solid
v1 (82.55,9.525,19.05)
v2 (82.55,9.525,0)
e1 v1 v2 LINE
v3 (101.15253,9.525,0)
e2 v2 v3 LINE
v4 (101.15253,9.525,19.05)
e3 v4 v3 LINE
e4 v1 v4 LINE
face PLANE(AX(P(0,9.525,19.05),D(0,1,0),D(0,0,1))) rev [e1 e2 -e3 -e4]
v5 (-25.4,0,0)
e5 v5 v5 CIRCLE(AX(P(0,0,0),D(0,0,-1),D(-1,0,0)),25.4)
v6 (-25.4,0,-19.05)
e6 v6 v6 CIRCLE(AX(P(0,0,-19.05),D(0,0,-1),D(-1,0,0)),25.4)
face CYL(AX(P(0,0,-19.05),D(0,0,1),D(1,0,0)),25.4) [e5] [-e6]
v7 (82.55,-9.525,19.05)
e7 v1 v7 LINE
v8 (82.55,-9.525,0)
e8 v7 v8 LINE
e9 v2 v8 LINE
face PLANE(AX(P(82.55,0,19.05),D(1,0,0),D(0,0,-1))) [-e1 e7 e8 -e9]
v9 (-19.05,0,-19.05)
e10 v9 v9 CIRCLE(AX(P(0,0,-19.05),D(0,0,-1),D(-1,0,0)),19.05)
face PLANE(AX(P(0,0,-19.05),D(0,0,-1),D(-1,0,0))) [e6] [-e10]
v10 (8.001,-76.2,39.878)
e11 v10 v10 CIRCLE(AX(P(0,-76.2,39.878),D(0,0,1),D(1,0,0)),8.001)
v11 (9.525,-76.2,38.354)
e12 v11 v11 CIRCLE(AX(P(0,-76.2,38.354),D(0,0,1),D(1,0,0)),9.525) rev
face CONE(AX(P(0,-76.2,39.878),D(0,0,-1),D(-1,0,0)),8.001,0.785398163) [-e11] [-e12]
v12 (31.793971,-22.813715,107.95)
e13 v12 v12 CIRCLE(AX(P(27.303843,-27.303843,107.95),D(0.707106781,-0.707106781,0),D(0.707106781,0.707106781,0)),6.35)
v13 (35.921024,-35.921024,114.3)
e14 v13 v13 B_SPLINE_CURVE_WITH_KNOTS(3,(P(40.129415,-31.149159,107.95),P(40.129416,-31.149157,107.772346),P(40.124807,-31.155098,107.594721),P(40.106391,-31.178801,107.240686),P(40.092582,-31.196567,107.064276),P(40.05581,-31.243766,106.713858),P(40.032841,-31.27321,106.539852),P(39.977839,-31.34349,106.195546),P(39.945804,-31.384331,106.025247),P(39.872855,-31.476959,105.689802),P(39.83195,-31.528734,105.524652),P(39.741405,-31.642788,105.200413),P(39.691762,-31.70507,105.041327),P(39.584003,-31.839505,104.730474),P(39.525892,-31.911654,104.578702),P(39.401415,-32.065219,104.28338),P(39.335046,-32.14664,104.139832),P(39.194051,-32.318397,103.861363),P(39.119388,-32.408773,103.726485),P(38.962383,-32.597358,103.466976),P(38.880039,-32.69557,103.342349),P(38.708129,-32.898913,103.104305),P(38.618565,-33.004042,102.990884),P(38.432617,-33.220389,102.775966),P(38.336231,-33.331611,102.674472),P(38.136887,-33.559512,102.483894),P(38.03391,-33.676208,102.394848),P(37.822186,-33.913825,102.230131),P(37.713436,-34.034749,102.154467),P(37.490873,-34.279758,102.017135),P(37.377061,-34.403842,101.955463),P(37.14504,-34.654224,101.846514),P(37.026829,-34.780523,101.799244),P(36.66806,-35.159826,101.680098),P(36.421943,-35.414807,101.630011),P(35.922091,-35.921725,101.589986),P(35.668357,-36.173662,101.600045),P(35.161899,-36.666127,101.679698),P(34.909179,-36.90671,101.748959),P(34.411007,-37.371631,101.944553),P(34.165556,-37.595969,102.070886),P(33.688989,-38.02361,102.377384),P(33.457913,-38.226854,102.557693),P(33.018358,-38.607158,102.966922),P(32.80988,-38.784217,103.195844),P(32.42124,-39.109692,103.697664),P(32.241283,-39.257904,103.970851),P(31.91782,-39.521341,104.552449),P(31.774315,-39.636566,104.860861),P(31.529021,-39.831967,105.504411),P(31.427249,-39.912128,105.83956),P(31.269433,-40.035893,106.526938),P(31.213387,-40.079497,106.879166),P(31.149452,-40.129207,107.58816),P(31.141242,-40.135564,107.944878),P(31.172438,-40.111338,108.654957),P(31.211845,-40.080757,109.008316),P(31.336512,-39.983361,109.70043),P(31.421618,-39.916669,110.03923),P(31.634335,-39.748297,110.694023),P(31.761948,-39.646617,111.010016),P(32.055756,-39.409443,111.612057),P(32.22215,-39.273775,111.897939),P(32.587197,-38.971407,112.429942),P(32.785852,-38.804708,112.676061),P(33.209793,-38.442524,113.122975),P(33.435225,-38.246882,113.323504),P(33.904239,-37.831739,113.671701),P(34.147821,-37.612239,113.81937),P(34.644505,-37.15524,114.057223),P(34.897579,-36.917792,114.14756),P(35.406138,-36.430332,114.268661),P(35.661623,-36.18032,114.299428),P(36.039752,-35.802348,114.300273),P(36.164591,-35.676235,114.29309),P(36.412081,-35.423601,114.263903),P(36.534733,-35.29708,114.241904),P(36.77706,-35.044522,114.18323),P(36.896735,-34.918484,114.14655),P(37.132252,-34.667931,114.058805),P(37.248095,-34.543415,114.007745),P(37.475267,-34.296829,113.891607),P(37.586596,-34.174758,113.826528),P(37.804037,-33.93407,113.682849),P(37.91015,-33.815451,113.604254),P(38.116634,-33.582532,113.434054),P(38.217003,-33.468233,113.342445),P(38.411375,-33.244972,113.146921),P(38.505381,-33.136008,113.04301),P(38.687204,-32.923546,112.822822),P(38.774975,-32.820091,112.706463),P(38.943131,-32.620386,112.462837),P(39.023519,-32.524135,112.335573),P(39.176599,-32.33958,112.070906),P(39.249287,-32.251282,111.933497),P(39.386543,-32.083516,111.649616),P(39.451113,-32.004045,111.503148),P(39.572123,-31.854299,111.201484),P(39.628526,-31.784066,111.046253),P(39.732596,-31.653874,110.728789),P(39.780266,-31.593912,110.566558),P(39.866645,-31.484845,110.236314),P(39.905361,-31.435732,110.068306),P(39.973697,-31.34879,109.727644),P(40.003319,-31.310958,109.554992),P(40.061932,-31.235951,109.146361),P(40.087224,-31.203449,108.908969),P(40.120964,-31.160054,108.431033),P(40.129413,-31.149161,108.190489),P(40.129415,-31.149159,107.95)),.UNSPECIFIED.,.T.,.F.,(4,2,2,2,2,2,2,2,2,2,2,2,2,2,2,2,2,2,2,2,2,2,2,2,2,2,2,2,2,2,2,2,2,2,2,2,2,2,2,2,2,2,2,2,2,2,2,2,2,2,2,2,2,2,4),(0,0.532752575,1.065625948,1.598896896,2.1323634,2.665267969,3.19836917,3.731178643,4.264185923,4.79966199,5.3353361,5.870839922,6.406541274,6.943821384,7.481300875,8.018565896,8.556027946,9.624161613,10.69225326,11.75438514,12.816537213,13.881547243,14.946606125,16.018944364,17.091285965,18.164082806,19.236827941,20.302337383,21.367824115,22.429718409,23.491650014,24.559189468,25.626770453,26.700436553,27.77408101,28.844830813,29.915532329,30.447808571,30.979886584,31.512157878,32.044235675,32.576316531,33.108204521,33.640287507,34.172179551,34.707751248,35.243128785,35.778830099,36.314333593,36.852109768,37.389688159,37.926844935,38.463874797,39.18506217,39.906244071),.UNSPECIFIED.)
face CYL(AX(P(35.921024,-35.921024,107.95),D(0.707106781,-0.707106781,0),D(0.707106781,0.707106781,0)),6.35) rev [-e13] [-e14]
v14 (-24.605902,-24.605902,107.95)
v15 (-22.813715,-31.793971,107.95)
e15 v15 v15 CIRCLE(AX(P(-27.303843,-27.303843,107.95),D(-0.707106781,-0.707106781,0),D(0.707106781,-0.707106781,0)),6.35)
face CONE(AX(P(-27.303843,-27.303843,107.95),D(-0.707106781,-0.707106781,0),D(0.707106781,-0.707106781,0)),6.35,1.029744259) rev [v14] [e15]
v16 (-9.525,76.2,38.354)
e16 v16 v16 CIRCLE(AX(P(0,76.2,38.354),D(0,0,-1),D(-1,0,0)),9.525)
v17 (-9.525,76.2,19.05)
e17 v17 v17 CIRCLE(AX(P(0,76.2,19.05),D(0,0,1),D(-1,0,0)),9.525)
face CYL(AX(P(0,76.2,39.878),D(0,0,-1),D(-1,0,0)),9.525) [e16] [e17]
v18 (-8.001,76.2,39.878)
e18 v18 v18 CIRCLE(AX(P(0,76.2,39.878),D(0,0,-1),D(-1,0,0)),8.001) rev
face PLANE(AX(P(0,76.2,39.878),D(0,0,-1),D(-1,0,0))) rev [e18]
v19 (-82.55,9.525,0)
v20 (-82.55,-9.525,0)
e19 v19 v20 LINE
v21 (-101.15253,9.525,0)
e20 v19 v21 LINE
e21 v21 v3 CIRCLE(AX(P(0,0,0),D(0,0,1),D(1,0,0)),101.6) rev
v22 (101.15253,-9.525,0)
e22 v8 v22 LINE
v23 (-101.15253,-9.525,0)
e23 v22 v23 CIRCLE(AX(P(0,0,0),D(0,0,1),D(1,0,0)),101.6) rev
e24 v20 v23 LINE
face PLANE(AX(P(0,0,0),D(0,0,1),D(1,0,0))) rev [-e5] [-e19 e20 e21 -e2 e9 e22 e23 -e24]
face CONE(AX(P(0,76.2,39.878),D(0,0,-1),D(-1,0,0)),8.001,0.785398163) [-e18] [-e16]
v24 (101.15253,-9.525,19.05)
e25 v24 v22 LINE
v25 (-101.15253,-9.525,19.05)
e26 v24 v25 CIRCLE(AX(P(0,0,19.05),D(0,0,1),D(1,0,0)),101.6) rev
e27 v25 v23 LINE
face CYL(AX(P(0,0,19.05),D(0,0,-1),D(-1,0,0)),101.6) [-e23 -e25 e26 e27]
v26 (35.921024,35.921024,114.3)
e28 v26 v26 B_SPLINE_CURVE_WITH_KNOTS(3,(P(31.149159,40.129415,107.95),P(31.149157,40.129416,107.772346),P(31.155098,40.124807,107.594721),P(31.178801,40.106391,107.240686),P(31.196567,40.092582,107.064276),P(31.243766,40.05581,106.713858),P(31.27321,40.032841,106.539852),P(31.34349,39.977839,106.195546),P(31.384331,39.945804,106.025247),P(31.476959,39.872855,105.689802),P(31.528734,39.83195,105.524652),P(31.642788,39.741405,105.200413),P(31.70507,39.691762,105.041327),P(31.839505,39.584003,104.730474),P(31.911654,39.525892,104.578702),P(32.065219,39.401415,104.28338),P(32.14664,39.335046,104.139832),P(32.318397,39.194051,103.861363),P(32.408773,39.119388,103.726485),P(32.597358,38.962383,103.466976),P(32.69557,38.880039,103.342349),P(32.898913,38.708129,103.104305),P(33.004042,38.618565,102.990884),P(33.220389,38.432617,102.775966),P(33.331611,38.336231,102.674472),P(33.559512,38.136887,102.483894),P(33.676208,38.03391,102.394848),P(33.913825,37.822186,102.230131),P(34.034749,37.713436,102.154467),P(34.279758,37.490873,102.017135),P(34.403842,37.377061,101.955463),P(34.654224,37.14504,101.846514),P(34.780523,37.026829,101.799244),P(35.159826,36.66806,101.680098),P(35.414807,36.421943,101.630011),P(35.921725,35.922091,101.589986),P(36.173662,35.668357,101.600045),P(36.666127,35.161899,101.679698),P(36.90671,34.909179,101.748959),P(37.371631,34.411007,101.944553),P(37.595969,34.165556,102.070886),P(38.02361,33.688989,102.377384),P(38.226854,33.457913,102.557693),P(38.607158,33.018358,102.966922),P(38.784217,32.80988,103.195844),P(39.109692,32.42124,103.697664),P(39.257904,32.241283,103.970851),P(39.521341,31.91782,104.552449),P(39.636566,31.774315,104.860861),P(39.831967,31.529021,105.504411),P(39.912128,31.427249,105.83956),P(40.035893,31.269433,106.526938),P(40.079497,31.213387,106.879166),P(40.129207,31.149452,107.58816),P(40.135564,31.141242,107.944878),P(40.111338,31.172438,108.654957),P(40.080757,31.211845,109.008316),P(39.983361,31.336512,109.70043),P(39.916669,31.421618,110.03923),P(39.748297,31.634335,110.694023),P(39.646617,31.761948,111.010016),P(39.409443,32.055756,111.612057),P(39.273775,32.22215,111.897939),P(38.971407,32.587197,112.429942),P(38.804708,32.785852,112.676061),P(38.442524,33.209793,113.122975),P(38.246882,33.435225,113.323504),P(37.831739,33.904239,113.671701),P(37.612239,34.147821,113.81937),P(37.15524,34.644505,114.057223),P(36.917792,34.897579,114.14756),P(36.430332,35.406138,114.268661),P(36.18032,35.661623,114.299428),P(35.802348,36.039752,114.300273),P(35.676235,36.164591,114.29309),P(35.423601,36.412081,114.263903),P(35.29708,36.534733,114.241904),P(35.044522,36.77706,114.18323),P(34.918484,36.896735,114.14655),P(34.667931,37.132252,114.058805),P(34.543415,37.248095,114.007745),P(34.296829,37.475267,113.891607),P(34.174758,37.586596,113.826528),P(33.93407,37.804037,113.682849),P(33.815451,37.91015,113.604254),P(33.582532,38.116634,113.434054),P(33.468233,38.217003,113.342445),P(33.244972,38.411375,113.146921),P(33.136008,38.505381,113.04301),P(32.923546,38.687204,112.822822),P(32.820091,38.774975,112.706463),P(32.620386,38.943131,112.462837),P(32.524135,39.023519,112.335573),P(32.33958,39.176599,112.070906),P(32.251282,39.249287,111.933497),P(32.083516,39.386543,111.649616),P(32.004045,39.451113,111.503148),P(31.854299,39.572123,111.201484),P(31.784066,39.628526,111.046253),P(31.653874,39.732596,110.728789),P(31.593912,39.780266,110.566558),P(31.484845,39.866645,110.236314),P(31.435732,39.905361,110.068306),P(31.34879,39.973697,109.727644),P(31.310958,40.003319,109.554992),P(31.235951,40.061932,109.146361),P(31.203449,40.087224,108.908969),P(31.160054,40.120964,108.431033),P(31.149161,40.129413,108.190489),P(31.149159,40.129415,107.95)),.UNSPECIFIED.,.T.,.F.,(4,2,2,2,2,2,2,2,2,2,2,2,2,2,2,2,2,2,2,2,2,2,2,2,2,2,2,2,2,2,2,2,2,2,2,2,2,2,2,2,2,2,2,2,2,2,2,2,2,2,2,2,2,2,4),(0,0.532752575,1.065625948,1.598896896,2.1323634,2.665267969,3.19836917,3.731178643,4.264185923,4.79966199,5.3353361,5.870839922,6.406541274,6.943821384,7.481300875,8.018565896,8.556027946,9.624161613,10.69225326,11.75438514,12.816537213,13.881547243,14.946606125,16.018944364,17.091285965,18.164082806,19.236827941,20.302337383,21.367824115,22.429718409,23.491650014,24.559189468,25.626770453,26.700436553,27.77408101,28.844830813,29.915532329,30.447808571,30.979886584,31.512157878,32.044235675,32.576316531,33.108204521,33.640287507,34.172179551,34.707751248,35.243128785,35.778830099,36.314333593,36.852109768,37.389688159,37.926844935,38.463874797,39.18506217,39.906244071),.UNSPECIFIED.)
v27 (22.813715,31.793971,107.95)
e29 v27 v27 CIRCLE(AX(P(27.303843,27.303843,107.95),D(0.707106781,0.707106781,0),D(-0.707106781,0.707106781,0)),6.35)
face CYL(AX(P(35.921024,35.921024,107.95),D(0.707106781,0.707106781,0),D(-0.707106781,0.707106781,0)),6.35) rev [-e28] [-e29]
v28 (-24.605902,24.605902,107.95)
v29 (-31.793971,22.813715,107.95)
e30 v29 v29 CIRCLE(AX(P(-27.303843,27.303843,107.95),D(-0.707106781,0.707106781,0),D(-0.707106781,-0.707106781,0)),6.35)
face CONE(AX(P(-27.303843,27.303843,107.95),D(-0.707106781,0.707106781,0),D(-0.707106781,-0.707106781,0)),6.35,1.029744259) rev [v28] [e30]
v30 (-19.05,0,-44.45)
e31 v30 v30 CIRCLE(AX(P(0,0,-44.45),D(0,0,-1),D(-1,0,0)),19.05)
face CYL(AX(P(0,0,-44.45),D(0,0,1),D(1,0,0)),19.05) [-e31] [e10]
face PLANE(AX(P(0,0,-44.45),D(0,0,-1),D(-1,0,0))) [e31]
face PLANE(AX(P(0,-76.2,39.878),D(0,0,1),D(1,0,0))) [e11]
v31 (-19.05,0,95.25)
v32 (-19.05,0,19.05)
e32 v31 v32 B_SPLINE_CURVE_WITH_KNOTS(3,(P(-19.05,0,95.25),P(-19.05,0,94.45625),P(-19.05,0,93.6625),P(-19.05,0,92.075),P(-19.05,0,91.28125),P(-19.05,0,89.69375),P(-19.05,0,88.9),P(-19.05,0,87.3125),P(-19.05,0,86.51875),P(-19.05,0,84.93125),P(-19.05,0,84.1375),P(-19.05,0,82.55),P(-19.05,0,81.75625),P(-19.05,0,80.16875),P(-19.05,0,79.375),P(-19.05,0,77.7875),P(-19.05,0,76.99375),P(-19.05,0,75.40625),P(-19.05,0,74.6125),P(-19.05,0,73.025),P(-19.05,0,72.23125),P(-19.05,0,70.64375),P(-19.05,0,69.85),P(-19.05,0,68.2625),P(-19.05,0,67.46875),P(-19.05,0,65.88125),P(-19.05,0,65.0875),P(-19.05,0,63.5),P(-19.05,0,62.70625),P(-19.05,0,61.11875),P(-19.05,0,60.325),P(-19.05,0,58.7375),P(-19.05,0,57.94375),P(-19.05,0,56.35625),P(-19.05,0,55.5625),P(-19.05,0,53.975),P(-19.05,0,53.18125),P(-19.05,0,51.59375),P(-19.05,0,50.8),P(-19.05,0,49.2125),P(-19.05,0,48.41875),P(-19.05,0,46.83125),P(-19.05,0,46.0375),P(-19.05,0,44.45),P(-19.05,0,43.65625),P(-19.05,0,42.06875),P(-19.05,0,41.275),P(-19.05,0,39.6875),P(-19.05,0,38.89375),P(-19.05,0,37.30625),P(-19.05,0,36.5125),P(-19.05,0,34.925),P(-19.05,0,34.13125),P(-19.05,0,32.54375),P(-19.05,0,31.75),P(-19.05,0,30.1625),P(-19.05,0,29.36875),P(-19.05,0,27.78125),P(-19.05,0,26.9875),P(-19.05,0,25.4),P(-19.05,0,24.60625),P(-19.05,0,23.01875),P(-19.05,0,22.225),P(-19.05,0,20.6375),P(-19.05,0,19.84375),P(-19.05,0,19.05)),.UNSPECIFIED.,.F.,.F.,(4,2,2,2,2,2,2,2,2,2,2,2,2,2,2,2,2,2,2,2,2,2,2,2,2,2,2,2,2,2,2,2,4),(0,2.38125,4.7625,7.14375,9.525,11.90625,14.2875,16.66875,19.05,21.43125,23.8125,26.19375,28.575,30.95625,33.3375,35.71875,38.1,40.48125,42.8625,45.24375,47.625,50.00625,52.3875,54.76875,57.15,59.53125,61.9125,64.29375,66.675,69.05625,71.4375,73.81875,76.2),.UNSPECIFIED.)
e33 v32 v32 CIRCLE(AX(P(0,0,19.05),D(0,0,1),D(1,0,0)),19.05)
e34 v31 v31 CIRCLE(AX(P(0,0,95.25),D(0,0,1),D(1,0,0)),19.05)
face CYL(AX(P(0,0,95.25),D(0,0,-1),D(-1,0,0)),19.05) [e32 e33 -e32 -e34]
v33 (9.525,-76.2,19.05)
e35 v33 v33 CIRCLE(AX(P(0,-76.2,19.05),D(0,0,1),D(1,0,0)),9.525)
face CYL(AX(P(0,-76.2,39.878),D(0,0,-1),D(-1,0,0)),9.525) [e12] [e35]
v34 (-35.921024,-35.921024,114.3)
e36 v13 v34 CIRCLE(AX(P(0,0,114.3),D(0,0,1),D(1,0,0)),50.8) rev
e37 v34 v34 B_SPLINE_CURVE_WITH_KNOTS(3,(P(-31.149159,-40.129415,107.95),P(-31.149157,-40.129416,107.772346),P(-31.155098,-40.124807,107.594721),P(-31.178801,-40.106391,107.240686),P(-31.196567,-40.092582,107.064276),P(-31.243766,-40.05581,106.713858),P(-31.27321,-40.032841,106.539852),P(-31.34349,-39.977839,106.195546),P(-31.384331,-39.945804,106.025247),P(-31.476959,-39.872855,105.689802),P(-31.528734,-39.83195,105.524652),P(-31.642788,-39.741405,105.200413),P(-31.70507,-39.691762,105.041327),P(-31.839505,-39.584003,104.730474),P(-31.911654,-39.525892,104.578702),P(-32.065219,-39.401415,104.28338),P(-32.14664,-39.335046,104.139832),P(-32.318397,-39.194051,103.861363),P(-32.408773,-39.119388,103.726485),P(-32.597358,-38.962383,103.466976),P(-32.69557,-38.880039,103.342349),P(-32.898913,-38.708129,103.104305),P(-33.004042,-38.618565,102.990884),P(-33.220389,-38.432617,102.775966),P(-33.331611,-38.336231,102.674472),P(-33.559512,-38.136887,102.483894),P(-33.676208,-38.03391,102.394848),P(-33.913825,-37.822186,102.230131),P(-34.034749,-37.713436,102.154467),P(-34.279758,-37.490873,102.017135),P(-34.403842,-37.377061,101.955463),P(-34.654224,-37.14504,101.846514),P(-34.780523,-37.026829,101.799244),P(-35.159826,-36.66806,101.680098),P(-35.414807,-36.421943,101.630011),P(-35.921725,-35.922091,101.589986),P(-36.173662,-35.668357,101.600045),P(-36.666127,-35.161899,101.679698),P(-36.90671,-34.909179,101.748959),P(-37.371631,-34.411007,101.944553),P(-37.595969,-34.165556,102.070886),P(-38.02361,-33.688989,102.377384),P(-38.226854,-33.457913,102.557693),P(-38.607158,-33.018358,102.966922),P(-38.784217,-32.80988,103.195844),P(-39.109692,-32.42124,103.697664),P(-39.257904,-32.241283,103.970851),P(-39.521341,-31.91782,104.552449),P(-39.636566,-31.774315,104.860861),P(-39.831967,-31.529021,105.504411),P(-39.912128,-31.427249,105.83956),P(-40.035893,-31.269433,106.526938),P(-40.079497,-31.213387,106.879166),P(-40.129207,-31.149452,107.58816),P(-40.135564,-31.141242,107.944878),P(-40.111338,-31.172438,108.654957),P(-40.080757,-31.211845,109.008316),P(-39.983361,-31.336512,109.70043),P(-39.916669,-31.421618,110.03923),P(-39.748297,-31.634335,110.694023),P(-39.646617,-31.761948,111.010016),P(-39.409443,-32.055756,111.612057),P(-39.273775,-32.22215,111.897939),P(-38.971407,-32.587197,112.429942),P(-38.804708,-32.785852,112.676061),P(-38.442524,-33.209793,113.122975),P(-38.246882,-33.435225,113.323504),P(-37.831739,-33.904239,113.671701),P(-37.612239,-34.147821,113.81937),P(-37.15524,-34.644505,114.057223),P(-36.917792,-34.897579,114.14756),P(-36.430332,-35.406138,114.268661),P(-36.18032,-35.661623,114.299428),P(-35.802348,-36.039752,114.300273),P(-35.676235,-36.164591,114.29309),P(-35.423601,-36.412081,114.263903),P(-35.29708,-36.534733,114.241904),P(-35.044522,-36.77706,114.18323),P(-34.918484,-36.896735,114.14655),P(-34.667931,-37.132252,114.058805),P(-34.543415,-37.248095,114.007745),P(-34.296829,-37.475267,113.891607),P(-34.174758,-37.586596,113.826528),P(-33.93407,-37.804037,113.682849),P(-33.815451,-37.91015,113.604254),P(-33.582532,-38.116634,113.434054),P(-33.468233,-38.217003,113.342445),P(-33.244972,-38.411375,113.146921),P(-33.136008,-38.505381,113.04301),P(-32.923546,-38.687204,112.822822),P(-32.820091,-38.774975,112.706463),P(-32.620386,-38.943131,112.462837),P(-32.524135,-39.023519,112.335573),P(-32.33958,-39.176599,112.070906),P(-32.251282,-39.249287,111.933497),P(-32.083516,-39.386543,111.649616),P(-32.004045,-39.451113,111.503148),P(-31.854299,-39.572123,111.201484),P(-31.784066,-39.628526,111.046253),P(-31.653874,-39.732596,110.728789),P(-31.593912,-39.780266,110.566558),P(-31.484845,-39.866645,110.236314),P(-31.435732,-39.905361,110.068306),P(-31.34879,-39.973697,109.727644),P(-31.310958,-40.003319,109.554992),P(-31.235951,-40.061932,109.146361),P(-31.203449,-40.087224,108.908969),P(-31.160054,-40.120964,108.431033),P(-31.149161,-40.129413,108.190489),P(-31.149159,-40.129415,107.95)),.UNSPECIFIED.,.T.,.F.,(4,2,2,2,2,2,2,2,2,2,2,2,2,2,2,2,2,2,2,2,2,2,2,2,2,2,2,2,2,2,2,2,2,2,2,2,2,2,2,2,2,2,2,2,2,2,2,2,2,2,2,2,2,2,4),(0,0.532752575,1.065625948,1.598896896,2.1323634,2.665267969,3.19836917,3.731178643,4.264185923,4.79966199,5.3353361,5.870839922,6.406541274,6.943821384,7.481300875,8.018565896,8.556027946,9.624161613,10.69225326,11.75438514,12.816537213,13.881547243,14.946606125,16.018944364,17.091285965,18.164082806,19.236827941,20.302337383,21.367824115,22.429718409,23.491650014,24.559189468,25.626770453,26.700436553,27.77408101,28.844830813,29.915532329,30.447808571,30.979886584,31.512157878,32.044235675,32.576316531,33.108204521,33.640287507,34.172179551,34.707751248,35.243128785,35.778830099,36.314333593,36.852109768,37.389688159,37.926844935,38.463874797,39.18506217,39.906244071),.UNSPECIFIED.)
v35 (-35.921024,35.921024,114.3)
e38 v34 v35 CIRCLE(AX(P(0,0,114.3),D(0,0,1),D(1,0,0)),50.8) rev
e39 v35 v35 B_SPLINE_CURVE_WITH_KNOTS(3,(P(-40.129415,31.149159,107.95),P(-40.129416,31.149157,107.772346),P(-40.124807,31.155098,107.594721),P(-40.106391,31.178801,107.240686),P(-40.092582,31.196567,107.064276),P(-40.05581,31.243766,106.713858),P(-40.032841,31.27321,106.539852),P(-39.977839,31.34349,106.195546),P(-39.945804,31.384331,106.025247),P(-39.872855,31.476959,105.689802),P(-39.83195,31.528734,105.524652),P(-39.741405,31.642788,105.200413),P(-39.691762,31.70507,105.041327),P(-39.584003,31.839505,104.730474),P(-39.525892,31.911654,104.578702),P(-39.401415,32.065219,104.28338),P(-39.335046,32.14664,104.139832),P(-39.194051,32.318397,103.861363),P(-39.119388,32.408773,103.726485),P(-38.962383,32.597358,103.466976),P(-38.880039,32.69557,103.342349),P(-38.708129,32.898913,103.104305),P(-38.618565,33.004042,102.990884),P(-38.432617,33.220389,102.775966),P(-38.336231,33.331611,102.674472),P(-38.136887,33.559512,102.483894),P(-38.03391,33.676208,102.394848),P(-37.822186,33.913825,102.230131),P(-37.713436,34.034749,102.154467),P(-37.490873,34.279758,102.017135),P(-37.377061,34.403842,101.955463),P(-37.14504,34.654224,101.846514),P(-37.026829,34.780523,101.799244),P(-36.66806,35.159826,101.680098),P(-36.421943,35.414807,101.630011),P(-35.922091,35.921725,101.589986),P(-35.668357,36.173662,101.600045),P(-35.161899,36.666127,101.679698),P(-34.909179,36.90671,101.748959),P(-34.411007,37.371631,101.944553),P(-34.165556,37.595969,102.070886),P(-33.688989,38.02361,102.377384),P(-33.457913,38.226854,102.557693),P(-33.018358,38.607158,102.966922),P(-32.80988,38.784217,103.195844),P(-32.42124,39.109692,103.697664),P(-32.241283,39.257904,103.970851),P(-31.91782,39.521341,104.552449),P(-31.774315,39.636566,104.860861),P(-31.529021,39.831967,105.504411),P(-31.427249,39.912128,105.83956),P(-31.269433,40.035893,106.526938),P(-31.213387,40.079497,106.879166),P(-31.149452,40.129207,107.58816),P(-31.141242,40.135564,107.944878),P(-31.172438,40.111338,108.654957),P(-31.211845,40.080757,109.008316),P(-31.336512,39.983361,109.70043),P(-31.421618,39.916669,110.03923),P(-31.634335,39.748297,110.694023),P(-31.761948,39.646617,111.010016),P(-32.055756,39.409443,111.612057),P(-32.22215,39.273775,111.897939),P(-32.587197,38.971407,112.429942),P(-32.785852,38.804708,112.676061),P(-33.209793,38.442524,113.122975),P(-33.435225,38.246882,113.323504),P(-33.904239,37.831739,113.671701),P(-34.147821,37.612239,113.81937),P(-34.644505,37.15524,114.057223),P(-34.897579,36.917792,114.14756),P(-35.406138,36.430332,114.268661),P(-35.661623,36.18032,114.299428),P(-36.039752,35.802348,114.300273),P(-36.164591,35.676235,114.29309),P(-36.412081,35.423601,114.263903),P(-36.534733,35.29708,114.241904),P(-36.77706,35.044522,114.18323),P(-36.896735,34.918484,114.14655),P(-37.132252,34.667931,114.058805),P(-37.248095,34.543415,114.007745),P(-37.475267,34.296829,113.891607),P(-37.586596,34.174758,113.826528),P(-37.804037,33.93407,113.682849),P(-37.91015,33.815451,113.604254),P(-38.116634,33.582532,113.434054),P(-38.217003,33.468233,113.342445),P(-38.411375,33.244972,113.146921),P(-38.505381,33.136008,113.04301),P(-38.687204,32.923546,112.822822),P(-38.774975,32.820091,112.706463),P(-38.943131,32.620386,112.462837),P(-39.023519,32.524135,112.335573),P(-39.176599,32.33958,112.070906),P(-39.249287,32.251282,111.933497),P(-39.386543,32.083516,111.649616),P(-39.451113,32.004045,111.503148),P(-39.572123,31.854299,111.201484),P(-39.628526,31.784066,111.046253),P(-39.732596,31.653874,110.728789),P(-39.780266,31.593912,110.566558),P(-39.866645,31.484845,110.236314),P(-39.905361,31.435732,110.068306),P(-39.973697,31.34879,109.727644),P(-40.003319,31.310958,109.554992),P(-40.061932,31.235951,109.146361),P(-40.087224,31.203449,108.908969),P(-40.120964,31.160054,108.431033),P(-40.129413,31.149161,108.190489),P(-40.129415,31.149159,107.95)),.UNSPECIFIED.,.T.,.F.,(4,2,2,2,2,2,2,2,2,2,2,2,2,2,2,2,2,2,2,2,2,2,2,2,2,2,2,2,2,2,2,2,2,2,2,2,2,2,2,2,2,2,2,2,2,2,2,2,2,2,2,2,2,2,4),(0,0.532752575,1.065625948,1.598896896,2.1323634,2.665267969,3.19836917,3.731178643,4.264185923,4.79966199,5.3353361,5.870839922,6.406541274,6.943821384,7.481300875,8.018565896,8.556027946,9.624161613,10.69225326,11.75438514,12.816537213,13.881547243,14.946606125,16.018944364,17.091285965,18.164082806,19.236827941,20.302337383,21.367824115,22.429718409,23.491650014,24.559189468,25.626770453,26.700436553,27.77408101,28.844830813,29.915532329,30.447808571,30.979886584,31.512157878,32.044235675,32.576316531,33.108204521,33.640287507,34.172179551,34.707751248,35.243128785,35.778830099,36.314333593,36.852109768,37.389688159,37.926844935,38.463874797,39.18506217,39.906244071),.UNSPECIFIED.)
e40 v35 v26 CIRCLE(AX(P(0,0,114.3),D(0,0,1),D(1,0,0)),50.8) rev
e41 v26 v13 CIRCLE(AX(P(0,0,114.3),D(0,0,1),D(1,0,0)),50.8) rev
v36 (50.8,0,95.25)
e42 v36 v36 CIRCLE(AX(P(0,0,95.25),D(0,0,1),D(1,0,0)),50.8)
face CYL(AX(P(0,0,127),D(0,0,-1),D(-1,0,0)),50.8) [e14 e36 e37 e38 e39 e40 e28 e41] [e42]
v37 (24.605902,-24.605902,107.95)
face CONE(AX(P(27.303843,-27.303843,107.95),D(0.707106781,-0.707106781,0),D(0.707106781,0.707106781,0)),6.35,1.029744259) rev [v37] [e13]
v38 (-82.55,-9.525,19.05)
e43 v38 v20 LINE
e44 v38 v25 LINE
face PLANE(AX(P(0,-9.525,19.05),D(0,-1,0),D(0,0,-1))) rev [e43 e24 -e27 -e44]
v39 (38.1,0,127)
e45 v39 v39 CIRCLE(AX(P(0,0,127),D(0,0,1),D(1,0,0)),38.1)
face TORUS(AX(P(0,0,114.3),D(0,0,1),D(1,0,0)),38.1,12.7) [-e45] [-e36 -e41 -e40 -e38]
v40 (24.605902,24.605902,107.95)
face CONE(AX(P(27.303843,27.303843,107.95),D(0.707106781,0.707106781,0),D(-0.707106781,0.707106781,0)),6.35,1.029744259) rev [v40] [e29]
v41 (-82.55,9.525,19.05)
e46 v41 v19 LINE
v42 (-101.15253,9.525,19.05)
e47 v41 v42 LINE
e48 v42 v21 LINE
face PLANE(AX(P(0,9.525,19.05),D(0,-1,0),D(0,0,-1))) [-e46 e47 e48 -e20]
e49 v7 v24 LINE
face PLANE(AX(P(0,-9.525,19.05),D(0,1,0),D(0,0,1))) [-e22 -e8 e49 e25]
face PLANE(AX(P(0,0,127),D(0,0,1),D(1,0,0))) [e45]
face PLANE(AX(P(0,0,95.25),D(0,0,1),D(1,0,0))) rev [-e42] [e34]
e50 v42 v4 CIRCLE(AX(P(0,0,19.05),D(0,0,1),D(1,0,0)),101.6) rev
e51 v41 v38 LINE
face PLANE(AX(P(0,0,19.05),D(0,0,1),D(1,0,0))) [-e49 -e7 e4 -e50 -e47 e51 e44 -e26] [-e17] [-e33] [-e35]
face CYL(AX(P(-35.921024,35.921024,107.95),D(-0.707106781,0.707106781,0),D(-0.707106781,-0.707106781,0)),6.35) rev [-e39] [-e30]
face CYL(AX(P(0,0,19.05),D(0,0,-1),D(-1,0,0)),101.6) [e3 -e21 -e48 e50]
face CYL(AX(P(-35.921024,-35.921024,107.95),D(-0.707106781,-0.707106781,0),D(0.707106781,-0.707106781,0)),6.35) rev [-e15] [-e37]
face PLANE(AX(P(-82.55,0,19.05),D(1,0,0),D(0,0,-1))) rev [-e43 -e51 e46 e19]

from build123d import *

# Parameters (mm, degrees)
BOSS_EXTRUDE1_DEPTH = 19.05
SKETCH2_R           = 9.525
BOSS_EXTRUDE2_DEPTH = 20.828
CHAMFER1_SIZE       = 1.524
SKETCH3_R           = 19.05
BOSS_EXTRUDE3_DEPTH = 76.2
SKETCH4_R           = 25.4
BOSS_EXTRUDE4_DEPTH = 19.05
BOSS_EXTRUDE5_START = 25.4
SKETCH5_R           = 19.05
BOSS_EXTRUDE5_DEPTH = 25.4
SKETCH7_R           = 50.8
BOSS_EXTRUDE6_DEPTH = 31.75
CIRPATTERN2_COUNT   = 4
FILLET2_R           = 12.7


with BuildPart() as part:
    # Sketch1 → Boss-Extrude1 (new body)
    with BuildSketch(Plane.XY):
        with BuildLine():
            Line((101.152530245, -9.525), (82.55, -9.525))
            Line((82.55, -9.525), (82.55, 9.525))
            Line((82.55, 9.525), (101.152530245, 9.525))
            ThreePointArc((101.152530245, 9.525), (0, 101.6), (-101.152530245, 9.525))
            Line((-101.152530245, 9.525), (-82.55, 9.525))
            Line((-82.55, 9.525), (-82.55, -9.525))
            Line((-82.55, -9.525), (-101.152530245, -9.525))
            ThreePointArc((-101.152530245, -9.525), (0, -101.6), (101.152530245, -9.525))
        make_face()
    extrude(amount=BOSS_EXTRUDE1_DEPTH)

    # Sketch2 → Boss-Extrude2 (add)
    with BuildSketch(Plane.XY.offset(19.05)):
        with Locations((0, -76.2)):
            Circle(SKETCH2_R)
        with Locations(Location((0, 76.2, 0), (0, 0, 180))):
            Circle(SKETCH2_R)
    extrude(amount=BOSS_EXTRUDE2_DEPTH)

    # Chamfer1
    chamfer1_edges = [part.edges().sort_by_distance(p)[0] for p in [
        (-9.525, -76.2, 39.878),
        (9.525, 76.2, 39.878),
    ]]
    chamfer(chamfer1_edges, length=CHAMFER1_SIZE)

    # Sketch3 → Boss-Extrude3 (add)
    with BuildSketch(Plane.XY.offset(19.05)):
        with Locations(Location((0, 0, 0), (0, 0, 180))):
            Circle(SKETCH3_R)
    extrude(amount=BOSS_EXTRUDE3_DEPTH)

    # Sketch4 → Boss-Extrude4 (add)
    with BuildSketch(Plane(origin=(0, 0, 0), x_dir=(-1, 0, 0), z_dir=(0, 0, -1))):
        Circle(SKETCH4_R)
    extrude(amount=BOSS_EXTRUDE4_DEPTH)

    # Sketch5 → Boss-Extrude5 (add)
    with BuildSketch(Plane(origin=(0, 0, -19.05), x_dir=(-1, 0, 0), z_dir=(0, 0, -1)).offset(BOSS_EXTRUDE5_START)):
        Circle(SKETCH5_R)
    extrude(amount=-BOSS_EXTRUDE5_DEPTH)

    # Sketch7 → Boss-Extrude6 (add)
    with BuildSketch(Plane.XY.offset(95.25)):
        Circle(SKETCH7_R)
    extrude(amount=BOSS_EXTRUDE6_DEPTH)

    # Sketch22 → #92 (0.5) Diameter Hole1 (revolve, cut)
    with BuildSketch(Plane(origin=(35.921024484, 35.921024484, 107.95), x_dir=(-0.7071067811865464, 0.7071067811865488, 0), z_dir=(0, 0, 1))):
        Polygon((0, 0), (0, 16.002), (6.35, 12.186535069), (6.35, 0), align=None)
    f_92_0_5_diameter_hole1 = revolve(axis=Axis((40.411152545, 40.411152545, 107.95), (-0.7071067811865487, -0.7071067811865465, 0)), mode=Mode.SUBTRACT)

    # CirPattern2: #92 (0.5) Diameter Hole1 ×4 about axis
    cirpattern2_axis = Axis((0, 0, 127), (0, 0, -1))
    for i in range(1, CIRPATTERN2_COUNT):
        add(f_92_0_5_diameter_hole1.rotate(cirpattern2_axis, i * 360 / CIRPATTERN2_COUNT), mode=Mode.SUBTRACT)

    # Fillet2
    fillet2_edges = [part.edges().sort_by_distance(p)[0] for p in [
        (-50.8, 0, 127),
    ]]
    fillet(fillet2_edges, radius=FILLET2_R - 0.0001)  # a hair under: the kernel refuses the full size


solid = part.part
